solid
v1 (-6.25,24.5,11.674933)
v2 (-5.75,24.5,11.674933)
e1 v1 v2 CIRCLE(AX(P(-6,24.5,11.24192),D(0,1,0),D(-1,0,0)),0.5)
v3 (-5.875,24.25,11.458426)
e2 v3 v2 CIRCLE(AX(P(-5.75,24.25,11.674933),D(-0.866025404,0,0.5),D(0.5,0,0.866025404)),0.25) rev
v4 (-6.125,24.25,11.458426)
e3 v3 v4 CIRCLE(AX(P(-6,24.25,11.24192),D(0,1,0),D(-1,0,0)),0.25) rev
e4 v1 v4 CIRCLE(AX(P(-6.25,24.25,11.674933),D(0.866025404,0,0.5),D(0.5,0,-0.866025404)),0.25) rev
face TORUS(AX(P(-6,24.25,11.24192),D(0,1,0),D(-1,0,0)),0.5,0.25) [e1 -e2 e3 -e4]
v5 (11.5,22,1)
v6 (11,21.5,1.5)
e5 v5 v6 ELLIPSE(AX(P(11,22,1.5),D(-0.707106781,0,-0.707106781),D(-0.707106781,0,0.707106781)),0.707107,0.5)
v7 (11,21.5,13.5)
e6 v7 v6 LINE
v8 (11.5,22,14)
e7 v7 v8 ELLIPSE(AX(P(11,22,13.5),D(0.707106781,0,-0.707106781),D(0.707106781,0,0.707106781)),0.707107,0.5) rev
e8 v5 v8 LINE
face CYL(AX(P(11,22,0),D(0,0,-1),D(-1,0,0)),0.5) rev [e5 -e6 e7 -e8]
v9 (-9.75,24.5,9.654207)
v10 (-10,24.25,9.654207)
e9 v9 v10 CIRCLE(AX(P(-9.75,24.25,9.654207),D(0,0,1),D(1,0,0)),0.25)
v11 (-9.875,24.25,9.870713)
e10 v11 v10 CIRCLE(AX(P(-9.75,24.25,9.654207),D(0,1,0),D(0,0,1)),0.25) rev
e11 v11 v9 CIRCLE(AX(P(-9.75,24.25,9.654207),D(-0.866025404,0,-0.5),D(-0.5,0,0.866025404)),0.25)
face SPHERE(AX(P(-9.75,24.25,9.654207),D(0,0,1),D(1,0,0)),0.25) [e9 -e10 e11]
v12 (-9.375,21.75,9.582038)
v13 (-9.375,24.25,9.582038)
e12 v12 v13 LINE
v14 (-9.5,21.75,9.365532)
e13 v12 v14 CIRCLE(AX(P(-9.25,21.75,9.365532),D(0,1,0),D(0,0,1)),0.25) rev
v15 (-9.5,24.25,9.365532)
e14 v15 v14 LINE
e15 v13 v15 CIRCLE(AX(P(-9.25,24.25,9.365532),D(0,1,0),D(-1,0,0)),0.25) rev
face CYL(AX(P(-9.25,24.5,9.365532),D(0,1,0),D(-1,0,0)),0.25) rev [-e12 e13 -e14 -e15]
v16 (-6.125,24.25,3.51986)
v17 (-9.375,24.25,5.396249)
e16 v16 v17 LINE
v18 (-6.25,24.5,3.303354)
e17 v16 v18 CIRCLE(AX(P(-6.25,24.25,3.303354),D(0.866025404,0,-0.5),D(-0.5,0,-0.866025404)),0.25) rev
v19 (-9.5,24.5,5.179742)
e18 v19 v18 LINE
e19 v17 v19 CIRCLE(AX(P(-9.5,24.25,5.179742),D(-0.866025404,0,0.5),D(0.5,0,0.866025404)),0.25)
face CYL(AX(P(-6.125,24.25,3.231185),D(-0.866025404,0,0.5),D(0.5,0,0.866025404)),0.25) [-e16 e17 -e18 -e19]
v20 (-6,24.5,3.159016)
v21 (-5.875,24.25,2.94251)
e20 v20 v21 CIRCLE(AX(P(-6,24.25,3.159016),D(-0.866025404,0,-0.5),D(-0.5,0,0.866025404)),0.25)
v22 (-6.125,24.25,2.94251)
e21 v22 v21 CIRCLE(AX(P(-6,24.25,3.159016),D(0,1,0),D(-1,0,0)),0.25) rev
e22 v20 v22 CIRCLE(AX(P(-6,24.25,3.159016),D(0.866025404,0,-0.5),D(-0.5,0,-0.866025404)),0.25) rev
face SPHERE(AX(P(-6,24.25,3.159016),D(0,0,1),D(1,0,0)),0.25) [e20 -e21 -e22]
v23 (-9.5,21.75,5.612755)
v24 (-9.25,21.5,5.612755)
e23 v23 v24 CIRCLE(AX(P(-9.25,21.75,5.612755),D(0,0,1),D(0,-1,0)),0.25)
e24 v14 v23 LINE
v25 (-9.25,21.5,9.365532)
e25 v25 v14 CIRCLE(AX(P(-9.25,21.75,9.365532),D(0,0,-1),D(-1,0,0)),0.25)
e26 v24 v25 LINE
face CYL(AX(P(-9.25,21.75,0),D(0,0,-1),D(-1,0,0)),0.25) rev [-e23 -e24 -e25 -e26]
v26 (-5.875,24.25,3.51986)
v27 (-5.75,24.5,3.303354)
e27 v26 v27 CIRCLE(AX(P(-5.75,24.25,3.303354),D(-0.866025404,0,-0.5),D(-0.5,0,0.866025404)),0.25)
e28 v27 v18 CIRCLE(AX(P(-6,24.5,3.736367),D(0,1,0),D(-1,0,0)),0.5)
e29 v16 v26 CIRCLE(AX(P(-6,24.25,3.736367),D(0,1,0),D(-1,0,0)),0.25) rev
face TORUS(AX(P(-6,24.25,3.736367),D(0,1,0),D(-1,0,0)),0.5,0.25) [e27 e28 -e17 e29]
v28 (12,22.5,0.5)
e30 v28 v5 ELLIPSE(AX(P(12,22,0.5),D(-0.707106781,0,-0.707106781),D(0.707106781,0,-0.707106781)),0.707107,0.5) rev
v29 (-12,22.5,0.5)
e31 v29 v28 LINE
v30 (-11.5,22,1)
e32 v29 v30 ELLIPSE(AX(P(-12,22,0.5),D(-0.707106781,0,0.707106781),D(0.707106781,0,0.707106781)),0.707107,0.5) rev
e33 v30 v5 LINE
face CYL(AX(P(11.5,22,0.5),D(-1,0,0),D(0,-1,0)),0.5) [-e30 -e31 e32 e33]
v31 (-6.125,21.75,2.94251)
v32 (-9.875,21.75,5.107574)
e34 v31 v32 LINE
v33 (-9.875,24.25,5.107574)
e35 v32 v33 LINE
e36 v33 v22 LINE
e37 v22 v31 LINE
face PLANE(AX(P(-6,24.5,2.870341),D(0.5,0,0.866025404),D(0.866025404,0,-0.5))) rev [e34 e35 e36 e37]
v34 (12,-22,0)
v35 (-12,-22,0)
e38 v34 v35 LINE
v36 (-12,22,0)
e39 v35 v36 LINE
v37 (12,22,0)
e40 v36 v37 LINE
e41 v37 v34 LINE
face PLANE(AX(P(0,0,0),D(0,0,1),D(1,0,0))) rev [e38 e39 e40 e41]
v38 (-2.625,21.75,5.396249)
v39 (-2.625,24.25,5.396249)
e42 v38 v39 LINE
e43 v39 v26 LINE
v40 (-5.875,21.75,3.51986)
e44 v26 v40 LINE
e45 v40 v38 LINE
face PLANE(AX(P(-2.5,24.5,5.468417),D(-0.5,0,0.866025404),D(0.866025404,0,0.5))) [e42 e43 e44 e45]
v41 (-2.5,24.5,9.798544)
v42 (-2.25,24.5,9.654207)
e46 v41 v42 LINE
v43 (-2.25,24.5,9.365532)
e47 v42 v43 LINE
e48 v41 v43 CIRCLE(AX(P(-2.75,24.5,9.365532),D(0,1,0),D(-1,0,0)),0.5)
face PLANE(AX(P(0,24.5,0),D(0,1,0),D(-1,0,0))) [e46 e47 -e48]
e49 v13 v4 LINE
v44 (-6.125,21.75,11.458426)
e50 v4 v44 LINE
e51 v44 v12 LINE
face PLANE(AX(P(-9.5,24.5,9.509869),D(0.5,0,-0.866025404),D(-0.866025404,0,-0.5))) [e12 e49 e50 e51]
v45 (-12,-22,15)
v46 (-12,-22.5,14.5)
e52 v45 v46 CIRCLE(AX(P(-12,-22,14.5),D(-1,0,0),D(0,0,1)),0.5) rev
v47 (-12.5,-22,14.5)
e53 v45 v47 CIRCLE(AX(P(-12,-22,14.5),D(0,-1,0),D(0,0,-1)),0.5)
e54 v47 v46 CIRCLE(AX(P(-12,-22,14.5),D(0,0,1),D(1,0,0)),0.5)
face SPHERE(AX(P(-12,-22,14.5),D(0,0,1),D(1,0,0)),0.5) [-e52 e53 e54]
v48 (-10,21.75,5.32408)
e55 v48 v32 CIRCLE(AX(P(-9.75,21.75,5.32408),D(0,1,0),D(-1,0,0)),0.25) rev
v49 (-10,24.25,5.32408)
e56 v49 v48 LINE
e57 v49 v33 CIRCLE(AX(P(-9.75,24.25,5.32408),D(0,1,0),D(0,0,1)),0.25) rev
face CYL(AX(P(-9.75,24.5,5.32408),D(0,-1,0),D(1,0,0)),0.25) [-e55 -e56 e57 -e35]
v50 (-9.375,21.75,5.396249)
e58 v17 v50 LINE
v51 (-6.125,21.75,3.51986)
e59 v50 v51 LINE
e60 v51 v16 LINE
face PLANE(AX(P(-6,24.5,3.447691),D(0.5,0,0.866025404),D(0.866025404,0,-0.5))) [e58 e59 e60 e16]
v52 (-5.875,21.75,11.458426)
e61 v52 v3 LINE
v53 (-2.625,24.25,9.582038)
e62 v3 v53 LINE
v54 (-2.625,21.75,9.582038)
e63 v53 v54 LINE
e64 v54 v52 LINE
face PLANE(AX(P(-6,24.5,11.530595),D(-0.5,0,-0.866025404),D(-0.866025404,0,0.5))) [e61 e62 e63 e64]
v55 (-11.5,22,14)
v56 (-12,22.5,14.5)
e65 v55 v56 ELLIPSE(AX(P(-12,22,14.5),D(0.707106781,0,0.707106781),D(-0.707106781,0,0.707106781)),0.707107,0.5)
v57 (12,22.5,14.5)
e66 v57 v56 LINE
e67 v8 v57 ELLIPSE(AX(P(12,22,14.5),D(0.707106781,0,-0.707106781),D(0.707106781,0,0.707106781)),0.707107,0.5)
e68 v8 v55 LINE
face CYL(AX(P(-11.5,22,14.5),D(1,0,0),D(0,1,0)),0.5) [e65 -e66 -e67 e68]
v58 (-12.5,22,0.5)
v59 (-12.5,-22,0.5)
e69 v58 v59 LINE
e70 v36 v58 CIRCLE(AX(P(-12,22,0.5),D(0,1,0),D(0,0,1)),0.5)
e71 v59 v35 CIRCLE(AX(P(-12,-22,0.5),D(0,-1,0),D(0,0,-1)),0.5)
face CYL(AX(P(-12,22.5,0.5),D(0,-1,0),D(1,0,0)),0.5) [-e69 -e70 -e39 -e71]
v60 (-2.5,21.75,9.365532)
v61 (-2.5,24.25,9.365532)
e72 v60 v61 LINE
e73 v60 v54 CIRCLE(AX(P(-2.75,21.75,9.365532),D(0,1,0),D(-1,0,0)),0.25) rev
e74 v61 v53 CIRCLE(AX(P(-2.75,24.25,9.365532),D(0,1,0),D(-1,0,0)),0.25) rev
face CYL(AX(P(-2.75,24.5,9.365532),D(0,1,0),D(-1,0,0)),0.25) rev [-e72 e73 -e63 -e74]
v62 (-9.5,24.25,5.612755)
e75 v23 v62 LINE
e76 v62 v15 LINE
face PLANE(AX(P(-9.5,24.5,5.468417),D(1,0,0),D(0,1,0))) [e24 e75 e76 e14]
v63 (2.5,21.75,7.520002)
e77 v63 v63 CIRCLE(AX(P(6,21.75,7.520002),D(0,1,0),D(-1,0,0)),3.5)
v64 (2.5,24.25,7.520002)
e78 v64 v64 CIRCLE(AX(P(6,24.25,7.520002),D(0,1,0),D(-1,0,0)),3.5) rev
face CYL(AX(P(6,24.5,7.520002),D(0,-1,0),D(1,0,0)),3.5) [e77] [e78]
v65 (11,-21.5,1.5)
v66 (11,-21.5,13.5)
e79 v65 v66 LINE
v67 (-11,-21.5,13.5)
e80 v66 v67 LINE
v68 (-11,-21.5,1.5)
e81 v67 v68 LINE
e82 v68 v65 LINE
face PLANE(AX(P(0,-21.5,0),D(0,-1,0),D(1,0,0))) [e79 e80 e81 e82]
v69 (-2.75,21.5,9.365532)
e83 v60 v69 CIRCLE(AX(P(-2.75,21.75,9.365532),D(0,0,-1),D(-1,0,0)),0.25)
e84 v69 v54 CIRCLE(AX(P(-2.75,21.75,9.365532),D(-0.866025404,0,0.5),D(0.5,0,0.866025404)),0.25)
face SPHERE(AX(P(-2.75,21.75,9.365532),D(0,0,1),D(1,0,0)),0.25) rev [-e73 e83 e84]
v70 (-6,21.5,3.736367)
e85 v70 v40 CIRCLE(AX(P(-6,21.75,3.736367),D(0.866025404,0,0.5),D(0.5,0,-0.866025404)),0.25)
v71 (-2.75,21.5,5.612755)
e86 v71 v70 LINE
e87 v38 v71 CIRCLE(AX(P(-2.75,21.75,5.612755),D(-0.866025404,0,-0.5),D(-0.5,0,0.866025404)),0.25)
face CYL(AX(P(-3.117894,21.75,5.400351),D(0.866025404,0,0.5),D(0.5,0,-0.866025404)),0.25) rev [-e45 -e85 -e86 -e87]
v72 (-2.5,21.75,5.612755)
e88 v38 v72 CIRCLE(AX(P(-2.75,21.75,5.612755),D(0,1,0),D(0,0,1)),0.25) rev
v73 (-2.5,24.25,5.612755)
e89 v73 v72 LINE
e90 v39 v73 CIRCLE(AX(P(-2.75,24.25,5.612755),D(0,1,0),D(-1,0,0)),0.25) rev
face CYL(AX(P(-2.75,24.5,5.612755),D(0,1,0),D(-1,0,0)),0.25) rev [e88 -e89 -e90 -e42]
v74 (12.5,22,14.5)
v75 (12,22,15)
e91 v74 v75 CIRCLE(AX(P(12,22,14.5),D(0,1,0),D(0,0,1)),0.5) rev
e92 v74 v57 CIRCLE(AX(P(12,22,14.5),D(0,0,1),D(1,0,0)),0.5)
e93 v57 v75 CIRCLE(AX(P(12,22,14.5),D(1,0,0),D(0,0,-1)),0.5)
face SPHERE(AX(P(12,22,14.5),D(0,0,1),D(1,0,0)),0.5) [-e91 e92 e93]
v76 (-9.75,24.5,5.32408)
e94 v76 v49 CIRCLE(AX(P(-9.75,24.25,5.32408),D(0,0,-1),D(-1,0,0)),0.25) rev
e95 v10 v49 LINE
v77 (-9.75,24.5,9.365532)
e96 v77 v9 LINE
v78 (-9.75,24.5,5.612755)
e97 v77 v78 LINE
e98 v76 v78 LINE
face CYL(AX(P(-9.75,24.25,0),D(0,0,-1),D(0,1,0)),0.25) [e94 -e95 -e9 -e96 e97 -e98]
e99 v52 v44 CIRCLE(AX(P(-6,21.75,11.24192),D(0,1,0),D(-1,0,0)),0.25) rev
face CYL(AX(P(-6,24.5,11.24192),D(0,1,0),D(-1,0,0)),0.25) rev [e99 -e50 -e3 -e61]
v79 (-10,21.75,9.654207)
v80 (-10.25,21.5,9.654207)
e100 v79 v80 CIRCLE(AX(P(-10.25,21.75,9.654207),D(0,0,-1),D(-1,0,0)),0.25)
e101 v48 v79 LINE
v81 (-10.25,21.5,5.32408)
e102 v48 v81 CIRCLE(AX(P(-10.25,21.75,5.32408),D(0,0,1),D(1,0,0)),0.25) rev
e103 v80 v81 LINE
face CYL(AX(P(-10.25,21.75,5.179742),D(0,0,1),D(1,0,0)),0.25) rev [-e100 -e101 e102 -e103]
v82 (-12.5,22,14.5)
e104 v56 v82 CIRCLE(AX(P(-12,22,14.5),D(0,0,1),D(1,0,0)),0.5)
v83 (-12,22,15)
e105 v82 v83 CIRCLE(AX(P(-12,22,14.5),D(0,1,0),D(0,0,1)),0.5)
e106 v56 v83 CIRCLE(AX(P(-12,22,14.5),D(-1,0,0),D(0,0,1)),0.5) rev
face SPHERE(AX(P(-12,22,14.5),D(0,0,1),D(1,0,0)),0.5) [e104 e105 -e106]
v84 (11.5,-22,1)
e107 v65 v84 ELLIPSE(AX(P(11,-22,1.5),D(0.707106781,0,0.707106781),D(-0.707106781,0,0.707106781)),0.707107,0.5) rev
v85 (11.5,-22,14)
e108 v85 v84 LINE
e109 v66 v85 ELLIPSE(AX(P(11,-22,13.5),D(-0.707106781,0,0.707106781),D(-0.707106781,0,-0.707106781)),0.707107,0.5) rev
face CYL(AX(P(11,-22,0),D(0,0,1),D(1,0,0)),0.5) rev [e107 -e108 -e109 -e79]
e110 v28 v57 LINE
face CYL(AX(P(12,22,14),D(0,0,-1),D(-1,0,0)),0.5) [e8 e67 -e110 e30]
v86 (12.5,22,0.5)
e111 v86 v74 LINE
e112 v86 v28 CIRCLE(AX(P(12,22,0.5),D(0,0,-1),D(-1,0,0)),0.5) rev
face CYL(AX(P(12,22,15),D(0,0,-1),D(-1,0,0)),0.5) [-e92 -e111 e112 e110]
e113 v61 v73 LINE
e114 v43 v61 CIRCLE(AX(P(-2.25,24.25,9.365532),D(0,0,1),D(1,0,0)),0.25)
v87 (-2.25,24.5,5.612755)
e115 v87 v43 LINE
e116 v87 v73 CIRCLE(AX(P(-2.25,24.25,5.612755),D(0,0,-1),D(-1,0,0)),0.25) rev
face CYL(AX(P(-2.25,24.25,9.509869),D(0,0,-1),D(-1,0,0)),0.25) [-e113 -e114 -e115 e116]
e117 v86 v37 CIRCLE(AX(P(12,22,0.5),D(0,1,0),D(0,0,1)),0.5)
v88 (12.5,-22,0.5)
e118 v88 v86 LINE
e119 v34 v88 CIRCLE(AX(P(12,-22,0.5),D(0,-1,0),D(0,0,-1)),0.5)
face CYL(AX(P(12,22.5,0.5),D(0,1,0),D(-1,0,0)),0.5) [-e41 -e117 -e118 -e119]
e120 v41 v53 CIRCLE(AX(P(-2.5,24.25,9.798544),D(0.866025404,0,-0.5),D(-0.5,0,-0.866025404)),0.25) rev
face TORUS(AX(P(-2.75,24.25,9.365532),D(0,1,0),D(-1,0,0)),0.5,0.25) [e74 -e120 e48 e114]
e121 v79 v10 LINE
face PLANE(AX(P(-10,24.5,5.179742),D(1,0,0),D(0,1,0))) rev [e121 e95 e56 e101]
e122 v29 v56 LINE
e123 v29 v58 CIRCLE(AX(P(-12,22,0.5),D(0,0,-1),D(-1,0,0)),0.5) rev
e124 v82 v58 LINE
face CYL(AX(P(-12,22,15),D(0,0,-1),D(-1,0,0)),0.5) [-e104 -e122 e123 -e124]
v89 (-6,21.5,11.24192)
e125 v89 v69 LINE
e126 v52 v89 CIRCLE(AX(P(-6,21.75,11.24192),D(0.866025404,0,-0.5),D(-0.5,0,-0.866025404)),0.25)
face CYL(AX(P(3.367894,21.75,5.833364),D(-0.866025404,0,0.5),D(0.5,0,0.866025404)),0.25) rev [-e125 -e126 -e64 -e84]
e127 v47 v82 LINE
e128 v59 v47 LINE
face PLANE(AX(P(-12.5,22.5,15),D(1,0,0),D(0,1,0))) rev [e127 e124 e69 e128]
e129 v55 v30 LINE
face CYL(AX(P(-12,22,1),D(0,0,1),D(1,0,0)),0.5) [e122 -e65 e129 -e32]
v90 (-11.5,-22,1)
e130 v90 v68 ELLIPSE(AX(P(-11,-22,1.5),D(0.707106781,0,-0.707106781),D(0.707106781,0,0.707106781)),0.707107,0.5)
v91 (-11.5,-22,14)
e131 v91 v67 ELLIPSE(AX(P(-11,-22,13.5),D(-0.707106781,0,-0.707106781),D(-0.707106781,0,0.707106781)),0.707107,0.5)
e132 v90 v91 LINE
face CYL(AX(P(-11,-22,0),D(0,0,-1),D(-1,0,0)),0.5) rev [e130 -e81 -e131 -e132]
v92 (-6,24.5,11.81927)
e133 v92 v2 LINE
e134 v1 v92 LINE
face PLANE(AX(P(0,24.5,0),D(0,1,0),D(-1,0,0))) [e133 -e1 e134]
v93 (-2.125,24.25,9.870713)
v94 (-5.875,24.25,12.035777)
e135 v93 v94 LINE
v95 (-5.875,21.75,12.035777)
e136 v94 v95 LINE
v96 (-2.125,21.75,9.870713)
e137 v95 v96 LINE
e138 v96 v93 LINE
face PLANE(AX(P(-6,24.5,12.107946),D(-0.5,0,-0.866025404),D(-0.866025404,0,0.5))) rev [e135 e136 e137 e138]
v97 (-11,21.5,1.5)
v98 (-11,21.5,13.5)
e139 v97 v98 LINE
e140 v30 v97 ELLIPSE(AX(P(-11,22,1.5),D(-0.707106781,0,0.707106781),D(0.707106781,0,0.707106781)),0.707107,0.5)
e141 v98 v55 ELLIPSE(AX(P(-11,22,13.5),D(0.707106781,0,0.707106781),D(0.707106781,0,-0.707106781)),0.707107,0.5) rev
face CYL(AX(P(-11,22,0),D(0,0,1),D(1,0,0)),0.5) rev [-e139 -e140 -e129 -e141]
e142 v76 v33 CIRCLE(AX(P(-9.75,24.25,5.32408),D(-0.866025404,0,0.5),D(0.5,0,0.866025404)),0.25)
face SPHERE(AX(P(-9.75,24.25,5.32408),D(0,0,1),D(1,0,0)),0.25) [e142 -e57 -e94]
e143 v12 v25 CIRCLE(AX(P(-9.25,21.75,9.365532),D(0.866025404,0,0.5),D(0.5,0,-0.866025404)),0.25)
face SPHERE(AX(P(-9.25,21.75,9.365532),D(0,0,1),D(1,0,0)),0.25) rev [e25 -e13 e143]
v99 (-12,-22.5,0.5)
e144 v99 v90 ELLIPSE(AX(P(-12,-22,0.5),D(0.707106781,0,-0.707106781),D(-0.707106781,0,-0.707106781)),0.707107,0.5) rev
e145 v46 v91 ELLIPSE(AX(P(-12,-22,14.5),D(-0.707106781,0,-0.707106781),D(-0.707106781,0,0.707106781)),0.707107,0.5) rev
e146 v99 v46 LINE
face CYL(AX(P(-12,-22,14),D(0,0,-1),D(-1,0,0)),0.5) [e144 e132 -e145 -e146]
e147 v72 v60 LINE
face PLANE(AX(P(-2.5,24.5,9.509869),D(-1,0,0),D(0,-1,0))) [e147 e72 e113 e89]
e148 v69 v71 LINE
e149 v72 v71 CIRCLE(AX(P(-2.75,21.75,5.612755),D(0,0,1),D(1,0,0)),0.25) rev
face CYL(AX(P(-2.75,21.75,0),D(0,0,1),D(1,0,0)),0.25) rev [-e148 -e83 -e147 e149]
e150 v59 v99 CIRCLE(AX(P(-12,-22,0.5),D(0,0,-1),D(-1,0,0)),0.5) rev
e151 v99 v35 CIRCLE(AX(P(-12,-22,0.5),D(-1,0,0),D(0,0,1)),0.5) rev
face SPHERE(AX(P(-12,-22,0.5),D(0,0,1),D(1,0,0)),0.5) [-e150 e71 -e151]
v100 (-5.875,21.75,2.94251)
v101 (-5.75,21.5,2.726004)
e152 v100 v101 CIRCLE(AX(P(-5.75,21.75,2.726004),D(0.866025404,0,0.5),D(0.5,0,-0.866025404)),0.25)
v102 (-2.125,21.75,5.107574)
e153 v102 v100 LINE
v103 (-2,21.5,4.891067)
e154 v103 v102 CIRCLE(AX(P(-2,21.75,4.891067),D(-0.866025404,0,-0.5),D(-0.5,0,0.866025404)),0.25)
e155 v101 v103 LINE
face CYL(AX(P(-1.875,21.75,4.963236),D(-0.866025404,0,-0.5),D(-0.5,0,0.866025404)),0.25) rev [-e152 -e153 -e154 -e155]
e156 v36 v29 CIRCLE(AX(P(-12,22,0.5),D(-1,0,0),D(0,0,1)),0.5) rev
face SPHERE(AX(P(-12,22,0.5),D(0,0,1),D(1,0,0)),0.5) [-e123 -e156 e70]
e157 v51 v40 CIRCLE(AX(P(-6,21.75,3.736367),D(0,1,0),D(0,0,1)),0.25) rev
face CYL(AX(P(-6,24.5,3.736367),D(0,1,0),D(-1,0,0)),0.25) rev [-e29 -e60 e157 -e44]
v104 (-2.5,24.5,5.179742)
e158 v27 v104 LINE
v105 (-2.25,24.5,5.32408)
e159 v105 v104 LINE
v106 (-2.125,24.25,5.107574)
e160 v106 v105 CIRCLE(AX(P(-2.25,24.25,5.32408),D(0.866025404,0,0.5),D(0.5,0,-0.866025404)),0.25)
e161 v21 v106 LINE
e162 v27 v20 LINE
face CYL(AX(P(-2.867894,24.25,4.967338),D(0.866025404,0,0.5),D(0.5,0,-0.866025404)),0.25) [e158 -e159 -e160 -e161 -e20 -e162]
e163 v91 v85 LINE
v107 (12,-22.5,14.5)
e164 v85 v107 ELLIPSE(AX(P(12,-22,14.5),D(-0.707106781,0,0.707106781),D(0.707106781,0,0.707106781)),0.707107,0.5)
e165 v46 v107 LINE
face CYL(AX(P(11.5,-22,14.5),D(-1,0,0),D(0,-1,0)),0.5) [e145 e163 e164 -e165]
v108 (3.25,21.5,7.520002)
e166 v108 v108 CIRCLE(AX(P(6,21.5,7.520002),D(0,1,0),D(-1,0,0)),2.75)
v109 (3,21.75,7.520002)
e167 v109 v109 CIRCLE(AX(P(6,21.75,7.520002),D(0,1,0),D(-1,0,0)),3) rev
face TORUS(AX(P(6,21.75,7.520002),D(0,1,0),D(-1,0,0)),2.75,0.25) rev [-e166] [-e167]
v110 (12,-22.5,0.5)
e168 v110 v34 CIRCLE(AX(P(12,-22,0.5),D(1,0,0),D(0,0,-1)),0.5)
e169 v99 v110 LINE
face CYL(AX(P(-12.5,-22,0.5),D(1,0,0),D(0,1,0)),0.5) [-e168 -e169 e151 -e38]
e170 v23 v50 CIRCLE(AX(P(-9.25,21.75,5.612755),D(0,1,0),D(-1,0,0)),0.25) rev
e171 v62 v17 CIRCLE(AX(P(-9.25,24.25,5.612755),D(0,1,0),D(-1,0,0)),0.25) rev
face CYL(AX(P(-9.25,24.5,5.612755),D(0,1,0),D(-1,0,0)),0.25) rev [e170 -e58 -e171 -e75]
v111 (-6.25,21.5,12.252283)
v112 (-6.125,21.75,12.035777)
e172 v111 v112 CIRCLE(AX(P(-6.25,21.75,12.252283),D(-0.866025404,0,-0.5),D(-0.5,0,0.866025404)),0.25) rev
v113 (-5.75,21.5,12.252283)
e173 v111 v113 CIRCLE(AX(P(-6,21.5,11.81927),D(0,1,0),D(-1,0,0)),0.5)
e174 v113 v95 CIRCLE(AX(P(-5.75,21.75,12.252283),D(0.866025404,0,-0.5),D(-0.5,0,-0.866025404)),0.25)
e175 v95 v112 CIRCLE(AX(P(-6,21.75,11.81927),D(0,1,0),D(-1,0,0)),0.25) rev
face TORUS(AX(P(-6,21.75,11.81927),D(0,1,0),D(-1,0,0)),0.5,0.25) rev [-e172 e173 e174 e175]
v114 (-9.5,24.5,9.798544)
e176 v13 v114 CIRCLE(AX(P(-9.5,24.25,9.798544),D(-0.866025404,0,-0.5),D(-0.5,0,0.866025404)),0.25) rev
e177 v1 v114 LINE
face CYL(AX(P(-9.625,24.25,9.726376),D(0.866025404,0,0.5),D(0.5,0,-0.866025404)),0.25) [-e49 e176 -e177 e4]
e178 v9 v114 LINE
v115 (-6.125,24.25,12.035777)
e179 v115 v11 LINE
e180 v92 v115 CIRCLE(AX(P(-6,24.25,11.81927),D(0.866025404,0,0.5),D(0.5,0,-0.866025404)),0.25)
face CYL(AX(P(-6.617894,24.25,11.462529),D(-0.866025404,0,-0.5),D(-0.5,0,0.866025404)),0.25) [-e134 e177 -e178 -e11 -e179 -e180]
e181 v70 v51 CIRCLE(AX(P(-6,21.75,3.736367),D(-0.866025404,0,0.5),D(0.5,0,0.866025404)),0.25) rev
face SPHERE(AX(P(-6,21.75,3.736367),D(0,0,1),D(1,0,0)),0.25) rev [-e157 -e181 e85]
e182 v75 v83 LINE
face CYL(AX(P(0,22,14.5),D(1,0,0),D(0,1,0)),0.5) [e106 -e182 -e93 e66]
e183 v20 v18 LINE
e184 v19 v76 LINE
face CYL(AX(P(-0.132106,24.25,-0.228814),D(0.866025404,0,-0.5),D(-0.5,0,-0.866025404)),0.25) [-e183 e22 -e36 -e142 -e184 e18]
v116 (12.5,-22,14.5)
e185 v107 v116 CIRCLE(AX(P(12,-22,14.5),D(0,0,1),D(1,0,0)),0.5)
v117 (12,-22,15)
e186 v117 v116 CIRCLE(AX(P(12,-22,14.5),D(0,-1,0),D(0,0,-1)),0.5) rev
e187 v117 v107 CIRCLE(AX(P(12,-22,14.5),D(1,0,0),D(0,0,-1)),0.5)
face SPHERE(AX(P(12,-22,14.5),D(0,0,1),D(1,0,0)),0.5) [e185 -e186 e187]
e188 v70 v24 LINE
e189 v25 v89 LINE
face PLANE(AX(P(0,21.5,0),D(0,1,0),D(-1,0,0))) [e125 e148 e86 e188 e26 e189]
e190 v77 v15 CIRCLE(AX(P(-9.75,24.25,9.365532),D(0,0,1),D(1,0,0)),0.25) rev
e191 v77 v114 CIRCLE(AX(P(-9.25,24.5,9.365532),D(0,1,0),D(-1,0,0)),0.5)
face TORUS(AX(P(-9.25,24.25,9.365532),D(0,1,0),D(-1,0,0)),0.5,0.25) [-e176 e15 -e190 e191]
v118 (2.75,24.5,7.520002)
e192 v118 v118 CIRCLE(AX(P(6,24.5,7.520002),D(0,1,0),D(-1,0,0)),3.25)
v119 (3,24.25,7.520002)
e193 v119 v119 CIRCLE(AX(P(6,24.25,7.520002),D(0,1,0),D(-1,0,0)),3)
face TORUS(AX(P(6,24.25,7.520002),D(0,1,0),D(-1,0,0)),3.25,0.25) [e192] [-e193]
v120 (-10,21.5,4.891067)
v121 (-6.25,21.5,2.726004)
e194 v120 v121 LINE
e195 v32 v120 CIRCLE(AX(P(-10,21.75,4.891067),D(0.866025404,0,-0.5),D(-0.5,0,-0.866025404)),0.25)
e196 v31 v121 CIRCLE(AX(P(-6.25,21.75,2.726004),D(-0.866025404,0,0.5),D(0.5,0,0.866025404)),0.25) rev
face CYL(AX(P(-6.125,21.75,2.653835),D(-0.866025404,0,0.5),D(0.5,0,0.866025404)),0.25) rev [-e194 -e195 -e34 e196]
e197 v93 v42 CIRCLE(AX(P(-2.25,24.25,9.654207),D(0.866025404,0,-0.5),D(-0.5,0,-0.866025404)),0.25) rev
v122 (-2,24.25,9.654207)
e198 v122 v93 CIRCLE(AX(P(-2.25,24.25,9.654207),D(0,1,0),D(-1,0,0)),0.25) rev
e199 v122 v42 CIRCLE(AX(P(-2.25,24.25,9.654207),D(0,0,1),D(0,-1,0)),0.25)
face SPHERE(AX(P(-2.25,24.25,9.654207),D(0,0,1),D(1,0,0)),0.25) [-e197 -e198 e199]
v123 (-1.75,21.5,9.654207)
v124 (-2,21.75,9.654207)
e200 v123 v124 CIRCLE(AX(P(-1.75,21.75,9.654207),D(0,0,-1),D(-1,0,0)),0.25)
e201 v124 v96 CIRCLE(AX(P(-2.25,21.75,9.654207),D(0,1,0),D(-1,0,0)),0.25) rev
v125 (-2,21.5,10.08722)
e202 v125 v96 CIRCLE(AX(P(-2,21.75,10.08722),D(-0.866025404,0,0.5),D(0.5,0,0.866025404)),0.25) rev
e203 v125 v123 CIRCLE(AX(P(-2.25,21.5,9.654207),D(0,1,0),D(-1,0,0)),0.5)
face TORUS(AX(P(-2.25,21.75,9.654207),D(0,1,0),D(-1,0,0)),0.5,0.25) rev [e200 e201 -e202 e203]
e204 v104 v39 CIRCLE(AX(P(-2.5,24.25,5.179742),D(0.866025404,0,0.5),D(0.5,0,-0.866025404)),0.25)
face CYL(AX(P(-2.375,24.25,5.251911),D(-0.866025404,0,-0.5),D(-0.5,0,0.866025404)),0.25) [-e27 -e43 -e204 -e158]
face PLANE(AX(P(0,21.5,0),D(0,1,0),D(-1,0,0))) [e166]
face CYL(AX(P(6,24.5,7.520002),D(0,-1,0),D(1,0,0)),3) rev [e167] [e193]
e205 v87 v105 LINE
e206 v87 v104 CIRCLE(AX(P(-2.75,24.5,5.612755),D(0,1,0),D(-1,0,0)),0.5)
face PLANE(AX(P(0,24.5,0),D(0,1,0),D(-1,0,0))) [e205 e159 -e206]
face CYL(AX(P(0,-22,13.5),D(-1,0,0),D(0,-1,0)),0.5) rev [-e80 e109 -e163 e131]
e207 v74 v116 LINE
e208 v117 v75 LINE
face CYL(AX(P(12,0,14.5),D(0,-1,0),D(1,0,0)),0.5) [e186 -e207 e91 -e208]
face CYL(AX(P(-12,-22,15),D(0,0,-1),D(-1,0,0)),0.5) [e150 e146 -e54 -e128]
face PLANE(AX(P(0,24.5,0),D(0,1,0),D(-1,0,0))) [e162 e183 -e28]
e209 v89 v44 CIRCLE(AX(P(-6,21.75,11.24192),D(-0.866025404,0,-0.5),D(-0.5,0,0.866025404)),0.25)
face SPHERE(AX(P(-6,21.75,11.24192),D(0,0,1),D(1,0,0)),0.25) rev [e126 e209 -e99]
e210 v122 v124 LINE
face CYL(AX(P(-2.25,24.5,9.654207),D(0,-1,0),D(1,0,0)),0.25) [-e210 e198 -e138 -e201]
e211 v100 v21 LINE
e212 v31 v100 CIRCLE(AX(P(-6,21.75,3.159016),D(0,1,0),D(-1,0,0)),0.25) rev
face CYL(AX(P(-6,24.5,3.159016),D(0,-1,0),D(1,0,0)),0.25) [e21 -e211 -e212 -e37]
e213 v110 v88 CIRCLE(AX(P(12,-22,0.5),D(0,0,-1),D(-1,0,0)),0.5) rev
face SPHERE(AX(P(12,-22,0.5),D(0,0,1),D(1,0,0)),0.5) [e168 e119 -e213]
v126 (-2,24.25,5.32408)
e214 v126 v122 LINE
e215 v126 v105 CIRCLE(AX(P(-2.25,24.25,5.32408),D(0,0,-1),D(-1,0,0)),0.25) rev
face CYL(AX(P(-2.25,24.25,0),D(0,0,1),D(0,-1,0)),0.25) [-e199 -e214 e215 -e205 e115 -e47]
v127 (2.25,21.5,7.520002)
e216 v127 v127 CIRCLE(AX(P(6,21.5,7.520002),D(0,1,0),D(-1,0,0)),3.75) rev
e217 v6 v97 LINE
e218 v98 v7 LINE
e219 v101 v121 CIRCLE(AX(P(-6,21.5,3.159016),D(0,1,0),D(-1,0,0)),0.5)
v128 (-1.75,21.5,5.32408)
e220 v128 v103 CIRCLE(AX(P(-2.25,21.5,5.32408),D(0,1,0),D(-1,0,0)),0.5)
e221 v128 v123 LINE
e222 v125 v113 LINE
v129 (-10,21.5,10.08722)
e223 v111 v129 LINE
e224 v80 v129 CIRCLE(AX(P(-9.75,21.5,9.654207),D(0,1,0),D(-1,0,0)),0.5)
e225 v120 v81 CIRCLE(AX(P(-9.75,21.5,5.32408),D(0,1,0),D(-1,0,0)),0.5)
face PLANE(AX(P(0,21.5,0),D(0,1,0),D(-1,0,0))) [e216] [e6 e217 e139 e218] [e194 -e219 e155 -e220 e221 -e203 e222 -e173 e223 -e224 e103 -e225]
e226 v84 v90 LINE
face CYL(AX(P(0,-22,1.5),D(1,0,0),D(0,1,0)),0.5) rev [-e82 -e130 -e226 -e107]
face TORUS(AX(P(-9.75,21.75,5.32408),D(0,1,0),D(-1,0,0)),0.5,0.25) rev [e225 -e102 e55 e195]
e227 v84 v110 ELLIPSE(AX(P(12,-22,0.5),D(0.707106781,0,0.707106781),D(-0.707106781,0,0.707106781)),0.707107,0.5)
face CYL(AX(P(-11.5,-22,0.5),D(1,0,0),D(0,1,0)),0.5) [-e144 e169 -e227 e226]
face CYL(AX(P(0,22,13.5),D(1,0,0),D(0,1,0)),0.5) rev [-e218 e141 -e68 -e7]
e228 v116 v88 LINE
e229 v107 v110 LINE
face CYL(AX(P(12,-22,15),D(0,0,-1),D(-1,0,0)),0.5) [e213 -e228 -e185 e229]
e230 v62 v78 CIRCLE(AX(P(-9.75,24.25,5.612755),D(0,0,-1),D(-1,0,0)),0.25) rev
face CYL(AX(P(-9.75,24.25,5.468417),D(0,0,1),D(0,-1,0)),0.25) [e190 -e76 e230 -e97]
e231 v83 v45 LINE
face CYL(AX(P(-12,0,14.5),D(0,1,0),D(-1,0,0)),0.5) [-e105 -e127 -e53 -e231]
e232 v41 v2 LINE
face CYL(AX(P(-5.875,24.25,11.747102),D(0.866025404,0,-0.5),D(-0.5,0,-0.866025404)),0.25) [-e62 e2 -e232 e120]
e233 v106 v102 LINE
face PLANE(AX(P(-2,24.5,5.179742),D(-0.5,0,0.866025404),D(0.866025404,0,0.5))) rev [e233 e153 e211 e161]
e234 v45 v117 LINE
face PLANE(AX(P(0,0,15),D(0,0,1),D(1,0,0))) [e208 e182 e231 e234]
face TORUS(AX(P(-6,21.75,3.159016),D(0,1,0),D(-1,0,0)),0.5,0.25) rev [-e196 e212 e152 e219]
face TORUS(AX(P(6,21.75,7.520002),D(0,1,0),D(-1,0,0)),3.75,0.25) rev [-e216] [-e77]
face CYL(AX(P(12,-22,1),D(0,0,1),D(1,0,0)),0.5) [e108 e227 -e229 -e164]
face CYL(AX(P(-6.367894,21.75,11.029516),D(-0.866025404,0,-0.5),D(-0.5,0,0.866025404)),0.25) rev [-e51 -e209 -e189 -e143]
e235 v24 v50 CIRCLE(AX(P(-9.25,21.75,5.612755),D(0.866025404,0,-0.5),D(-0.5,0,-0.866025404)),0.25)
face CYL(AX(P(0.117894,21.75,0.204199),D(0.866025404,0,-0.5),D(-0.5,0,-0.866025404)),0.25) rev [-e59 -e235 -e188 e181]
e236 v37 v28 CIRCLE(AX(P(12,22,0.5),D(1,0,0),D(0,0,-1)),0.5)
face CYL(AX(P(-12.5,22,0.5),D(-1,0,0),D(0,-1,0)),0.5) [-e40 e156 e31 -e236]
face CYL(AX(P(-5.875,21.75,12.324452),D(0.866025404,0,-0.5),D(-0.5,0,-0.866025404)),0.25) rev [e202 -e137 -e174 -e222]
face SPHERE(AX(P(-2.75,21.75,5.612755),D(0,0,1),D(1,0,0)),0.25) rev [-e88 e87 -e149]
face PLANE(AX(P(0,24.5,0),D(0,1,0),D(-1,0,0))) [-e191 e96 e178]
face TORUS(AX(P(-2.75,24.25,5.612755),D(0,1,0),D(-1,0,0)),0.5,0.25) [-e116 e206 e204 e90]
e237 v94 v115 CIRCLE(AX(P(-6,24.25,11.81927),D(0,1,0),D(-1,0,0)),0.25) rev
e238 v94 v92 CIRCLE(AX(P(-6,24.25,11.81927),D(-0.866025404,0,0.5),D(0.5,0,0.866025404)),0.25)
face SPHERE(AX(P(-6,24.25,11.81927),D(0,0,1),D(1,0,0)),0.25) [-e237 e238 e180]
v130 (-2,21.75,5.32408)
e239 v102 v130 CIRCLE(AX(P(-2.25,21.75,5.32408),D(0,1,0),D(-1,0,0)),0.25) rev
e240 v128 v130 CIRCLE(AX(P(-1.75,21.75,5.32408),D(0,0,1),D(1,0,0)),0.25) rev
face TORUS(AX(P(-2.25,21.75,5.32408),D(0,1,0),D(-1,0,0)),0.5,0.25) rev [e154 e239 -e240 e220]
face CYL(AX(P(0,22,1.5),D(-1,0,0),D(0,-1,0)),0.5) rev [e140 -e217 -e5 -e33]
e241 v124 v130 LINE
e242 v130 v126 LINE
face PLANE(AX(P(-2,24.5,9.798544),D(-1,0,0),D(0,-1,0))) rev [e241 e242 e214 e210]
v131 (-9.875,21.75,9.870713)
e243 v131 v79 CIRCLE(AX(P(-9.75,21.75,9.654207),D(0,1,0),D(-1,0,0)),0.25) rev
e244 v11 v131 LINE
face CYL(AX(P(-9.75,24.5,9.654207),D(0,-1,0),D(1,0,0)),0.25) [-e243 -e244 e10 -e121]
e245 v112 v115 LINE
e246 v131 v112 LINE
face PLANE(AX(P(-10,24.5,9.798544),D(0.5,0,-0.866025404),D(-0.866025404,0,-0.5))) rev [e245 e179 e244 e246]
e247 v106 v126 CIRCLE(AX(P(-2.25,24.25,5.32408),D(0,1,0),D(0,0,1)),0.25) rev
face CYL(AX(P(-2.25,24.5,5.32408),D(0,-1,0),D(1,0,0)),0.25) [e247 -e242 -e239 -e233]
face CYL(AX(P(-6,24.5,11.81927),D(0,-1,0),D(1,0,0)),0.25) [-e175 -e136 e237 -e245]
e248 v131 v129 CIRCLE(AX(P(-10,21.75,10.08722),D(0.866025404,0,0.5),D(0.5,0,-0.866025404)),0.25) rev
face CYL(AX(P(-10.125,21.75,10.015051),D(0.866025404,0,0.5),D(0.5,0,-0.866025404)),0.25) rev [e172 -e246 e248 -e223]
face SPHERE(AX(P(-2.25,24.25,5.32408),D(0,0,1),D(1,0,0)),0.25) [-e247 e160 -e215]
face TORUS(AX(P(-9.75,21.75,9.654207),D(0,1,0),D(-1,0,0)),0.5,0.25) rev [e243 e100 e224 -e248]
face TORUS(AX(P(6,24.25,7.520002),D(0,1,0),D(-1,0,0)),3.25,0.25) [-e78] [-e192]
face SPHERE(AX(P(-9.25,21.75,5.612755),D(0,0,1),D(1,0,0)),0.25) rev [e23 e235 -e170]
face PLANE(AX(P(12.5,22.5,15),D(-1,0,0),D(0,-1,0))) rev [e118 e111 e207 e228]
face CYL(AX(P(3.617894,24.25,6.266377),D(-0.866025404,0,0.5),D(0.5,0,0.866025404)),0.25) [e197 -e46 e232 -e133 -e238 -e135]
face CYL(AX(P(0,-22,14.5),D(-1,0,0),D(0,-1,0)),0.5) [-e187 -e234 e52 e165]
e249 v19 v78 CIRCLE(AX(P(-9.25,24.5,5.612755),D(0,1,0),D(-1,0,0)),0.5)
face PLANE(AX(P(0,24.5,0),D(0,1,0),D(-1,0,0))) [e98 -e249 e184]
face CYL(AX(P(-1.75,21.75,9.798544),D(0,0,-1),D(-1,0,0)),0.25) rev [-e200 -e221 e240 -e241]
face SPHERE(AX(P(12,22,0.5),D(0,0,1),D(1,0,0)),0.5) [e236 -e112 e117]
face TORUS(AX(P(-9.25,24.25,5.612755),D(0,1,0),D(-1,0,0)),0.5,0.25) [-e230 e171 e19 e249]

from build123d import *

# Parameters (mm, degrees)
SKETCH1_W           = 25
SKETCH1_H           = 45
BOSS_EXTRUDE1_DEPTH = 15
SKETCH2_W           = 23
SKETCH2_H           = 13
CUT_EXTRUDE1_DEPTH  = 1
SKETCH3_W           = 23
SKETCH3_H           = 13
CUT_EXTRUDE2_DEPTH  = 1
FILLET2_R           = 0.5
SKETCH4_R           = 3.5
SKETCH4_R_2         = 3
BOSS_EXTRUDE2_DEPTH = 3
FILLET3_R           = 0.25


with BuildPart() as part:
    # Sketch1 → Boss-Extrude1 (new body)
    with BuildSketch(Plane.XY):
        Rectangle(SKETCH1_W, SKETCH1_H)
    extrude(amount=BOSS_EXTRUDE1_DEPTH)

    # Sketch2 → Cut-Extrude1 (cut)
    with BuildSketch(Plane(origin=(0, 22.5, 0), x_dir=(1, 0, 0), z_dir=(0, 1, 0))):
        with Locations((0, -7.5)):
            Rectangle(SKETCH2_W, SKETCH2_H)
    extrude(amount=-CUT_EXTRUDE1_DEPTH, mode=Mode.SUBTRACT)

    # Sketch3 → Cut-Extrude2 (cut)
    with BuildSketch(Plane.XZ.offset(22.5)):
        with Locations((0, 7.5)):
            Rectangle(SKETCH3_W, SKETCH3_H)
    extrude(amount=-CUT_EXTRUDE2_DEPTH, mode=Mode.SUBTRACT)

    # Fillet2
    fillet2_edges = [part.edges().sort_by_distance(p)[0] for p in [
        (12.5, 22.5, 7.5),
        (0, 22.5, 15),
        (-12.5, 22.5, 7.5),
        (0, 22.5, 0),
        (-11.5, 22.5, 7.5),
        (0, 22.5, 14),
        (11.5, 22.5, 7.5),
        (0, 22.5, 1),
        (0, 21.5, 14),
        (-11.5, 21.5, 7.5),
        (0, 21.5, 1),
        (11.5, 21.5, 7.5),
        (-12.5, -22.5, 7.5),
        (0, -22.5, 15),
        (12.5, -22.5, 7.5),
        (0, -22.5, 0),
        (11.5, -22.5, 7.5),
        (0, -22.5, 14),
        (-11.5, -22.5, 7.5),
        (0, -22.5, 1),
        (0, -21.5, 14),
        (11.5, -21.5, 7.5),
        (0, -21.5, 1),
        (-11.5, -21.5, 7.5),
        (12.5, 0, 15),
        (-12.5, 0, 15),
        (-12.5, 0, 0),
        (12.5, 0, 0),
    ]]
    fillet(fillet2_edges, radius=FILLET2_R - 0.0001)  # a hair under: the kernel refuses the full size

    # Sketch4 → Boss-Extrude2 (add)
    # profile 1 of 2: a face of its own
    with BuildSketch(Plane(origin=(0, 21.5, 0), x_dir=(1, 0, 0), z_dir=(0, 1, 0))):
        with Locations(Location((6, -7.520001538, 0), (0, 0, 180))):
            Circle(SKETCH4_R)
        with Locations(Location((6, -7.520001538, 0), (0, 0, 180))):
            Circle(SKETCH4_R_2, mode=Mode.SUBTRACT)
    # profile 2 of 2: a face of its own
    with BuildSketch(Plane(origin=(0, 21.5, 0), x_dir=(1, 0, 0), z_dir=(0, 1, 0))):
        Polygon((-6, -12.10794553), (-2, -9.798544453), (-2, -5.179742299), (-6, -2.870341223), (-10, -5.179742299), (-10, -9.798544453), align=None)
        Polygon((-6, -11.530595261), (-2.5, -9.509869318), (-2.5, -5.468417434), (-6, -3.447691492), (-9.5, -5.468417434), (-9.5, -9.509869318), align=None, mode=Mode.SUBTRACT)
    extrude(amount=BOSS_EXTRUDE2_DEPTH)

    # Fillet3
    fillet3_edges = [part.edges().sort_by_distance(p)[0] for p in [
        (-7.75, 21.5, 10.520232289),
        (-4.25, 21.5, 10.520232289),
        (-2.5, 21.5, 7.489143376),
        (-4.25, 21.5, 4.458054463),
        (-7.75, 21.5, 4.458054463),
        (-9.5, 21.5, 7.489143376),
        (-6, 23, 11.530595261),
        (-2.5, 23, 9.509869318),
        (-2.5, 23, 5.468417434),
        (-6, 23, 3.447691492),
        (-9.5, 23, 5.468417434),
        (-9.5, 23, 9.509869318),
        (9, 21.5, 7.520001538),
        (9.5, 21.5, 7.520001538),
    ]]
    fillet(fillet3_edges, radius=FILLET3_R)
    fillet3_2_edges = [part.edges().sort_by_distance(p)[0] for p in [
        (-8, 24.5, 10.953244991),
        (-4, 24.5, 10.953244991),
        (-2, 24.5, 7.489143376),
        (-4, 24.5, 4.025041761),
        (-8, 24.5, 4.025041761),
        (-10, 24.5, 7.489143376),
        (-10, 23, 9.798544453),
        (-6, 23, 12.10794553),
        (-2, 23, 9.798544453),
        (-2, 23, 5.179742299),
        (-6, 23, 2.870341223),
        (-10, 23, 5.179742299),
        (9.5, 24.5, 7.520001538),
        (9, 24.5, 7.520001538),
    ]]
    fillet(fillet3_2_edges, radius=FILLET3_R - 0.0001)  # a hair under: the kernel refuses the full size
    fillet3_3_edges = [part.edges().sort_by_distance(p)[0] for p in [
        (-8, 21.5, 10.953244991),
        (-4, 21.5, 10.953244991),
        (-2, 21.5, 7.489143376),
        (-4, 21.5, 4.025041761),
        (-8, 21.5, 4.025041761),
        (-10, 21.5, 7.489143376),
        (-9.966519748, 21.5, 5.199072132),
        (-9.966519748, 21.5, 9.779214621),
        (-6, 21.5, 2.909000887),
        (-2.033480252, 21.5, 5.199072132),
        (-2.033480252, 21.5, 9.779214621),
        (-6, 21.5, 12.069285865),
    ]]
    fillet(fillet3_3_edges, radius=FILLET3_R)
    fillet3_4_edges = [part.edges().sort_by_distance(p)[0] for p in [
        (-7.75, 24.5, 10.520232289),
        (-4.25, 24.5, 10.520232289),
        (-2.5, 24.5, 7.489143376),
        (-4.25, 24.5, 4.458054463),
        (-7.75, 24.5, 4.458054463),
        (-9.5, 24.5, 7.489143376),
        (-9.466506351, 24.5, 5.487755001),
        (-9.466506351, 24.5, 9.490531751),
        (-6, 24.5, 3.486366626),
        (-2.533493649, 24.5, 5.487755001),
        (-2.533493649, 24.5, 9.490531751),
        (-6, 24.5, 11.491920126),
    ]]
    fillet(fillet3_4_edges, radius=FILLET3_R)


solid = part.part
